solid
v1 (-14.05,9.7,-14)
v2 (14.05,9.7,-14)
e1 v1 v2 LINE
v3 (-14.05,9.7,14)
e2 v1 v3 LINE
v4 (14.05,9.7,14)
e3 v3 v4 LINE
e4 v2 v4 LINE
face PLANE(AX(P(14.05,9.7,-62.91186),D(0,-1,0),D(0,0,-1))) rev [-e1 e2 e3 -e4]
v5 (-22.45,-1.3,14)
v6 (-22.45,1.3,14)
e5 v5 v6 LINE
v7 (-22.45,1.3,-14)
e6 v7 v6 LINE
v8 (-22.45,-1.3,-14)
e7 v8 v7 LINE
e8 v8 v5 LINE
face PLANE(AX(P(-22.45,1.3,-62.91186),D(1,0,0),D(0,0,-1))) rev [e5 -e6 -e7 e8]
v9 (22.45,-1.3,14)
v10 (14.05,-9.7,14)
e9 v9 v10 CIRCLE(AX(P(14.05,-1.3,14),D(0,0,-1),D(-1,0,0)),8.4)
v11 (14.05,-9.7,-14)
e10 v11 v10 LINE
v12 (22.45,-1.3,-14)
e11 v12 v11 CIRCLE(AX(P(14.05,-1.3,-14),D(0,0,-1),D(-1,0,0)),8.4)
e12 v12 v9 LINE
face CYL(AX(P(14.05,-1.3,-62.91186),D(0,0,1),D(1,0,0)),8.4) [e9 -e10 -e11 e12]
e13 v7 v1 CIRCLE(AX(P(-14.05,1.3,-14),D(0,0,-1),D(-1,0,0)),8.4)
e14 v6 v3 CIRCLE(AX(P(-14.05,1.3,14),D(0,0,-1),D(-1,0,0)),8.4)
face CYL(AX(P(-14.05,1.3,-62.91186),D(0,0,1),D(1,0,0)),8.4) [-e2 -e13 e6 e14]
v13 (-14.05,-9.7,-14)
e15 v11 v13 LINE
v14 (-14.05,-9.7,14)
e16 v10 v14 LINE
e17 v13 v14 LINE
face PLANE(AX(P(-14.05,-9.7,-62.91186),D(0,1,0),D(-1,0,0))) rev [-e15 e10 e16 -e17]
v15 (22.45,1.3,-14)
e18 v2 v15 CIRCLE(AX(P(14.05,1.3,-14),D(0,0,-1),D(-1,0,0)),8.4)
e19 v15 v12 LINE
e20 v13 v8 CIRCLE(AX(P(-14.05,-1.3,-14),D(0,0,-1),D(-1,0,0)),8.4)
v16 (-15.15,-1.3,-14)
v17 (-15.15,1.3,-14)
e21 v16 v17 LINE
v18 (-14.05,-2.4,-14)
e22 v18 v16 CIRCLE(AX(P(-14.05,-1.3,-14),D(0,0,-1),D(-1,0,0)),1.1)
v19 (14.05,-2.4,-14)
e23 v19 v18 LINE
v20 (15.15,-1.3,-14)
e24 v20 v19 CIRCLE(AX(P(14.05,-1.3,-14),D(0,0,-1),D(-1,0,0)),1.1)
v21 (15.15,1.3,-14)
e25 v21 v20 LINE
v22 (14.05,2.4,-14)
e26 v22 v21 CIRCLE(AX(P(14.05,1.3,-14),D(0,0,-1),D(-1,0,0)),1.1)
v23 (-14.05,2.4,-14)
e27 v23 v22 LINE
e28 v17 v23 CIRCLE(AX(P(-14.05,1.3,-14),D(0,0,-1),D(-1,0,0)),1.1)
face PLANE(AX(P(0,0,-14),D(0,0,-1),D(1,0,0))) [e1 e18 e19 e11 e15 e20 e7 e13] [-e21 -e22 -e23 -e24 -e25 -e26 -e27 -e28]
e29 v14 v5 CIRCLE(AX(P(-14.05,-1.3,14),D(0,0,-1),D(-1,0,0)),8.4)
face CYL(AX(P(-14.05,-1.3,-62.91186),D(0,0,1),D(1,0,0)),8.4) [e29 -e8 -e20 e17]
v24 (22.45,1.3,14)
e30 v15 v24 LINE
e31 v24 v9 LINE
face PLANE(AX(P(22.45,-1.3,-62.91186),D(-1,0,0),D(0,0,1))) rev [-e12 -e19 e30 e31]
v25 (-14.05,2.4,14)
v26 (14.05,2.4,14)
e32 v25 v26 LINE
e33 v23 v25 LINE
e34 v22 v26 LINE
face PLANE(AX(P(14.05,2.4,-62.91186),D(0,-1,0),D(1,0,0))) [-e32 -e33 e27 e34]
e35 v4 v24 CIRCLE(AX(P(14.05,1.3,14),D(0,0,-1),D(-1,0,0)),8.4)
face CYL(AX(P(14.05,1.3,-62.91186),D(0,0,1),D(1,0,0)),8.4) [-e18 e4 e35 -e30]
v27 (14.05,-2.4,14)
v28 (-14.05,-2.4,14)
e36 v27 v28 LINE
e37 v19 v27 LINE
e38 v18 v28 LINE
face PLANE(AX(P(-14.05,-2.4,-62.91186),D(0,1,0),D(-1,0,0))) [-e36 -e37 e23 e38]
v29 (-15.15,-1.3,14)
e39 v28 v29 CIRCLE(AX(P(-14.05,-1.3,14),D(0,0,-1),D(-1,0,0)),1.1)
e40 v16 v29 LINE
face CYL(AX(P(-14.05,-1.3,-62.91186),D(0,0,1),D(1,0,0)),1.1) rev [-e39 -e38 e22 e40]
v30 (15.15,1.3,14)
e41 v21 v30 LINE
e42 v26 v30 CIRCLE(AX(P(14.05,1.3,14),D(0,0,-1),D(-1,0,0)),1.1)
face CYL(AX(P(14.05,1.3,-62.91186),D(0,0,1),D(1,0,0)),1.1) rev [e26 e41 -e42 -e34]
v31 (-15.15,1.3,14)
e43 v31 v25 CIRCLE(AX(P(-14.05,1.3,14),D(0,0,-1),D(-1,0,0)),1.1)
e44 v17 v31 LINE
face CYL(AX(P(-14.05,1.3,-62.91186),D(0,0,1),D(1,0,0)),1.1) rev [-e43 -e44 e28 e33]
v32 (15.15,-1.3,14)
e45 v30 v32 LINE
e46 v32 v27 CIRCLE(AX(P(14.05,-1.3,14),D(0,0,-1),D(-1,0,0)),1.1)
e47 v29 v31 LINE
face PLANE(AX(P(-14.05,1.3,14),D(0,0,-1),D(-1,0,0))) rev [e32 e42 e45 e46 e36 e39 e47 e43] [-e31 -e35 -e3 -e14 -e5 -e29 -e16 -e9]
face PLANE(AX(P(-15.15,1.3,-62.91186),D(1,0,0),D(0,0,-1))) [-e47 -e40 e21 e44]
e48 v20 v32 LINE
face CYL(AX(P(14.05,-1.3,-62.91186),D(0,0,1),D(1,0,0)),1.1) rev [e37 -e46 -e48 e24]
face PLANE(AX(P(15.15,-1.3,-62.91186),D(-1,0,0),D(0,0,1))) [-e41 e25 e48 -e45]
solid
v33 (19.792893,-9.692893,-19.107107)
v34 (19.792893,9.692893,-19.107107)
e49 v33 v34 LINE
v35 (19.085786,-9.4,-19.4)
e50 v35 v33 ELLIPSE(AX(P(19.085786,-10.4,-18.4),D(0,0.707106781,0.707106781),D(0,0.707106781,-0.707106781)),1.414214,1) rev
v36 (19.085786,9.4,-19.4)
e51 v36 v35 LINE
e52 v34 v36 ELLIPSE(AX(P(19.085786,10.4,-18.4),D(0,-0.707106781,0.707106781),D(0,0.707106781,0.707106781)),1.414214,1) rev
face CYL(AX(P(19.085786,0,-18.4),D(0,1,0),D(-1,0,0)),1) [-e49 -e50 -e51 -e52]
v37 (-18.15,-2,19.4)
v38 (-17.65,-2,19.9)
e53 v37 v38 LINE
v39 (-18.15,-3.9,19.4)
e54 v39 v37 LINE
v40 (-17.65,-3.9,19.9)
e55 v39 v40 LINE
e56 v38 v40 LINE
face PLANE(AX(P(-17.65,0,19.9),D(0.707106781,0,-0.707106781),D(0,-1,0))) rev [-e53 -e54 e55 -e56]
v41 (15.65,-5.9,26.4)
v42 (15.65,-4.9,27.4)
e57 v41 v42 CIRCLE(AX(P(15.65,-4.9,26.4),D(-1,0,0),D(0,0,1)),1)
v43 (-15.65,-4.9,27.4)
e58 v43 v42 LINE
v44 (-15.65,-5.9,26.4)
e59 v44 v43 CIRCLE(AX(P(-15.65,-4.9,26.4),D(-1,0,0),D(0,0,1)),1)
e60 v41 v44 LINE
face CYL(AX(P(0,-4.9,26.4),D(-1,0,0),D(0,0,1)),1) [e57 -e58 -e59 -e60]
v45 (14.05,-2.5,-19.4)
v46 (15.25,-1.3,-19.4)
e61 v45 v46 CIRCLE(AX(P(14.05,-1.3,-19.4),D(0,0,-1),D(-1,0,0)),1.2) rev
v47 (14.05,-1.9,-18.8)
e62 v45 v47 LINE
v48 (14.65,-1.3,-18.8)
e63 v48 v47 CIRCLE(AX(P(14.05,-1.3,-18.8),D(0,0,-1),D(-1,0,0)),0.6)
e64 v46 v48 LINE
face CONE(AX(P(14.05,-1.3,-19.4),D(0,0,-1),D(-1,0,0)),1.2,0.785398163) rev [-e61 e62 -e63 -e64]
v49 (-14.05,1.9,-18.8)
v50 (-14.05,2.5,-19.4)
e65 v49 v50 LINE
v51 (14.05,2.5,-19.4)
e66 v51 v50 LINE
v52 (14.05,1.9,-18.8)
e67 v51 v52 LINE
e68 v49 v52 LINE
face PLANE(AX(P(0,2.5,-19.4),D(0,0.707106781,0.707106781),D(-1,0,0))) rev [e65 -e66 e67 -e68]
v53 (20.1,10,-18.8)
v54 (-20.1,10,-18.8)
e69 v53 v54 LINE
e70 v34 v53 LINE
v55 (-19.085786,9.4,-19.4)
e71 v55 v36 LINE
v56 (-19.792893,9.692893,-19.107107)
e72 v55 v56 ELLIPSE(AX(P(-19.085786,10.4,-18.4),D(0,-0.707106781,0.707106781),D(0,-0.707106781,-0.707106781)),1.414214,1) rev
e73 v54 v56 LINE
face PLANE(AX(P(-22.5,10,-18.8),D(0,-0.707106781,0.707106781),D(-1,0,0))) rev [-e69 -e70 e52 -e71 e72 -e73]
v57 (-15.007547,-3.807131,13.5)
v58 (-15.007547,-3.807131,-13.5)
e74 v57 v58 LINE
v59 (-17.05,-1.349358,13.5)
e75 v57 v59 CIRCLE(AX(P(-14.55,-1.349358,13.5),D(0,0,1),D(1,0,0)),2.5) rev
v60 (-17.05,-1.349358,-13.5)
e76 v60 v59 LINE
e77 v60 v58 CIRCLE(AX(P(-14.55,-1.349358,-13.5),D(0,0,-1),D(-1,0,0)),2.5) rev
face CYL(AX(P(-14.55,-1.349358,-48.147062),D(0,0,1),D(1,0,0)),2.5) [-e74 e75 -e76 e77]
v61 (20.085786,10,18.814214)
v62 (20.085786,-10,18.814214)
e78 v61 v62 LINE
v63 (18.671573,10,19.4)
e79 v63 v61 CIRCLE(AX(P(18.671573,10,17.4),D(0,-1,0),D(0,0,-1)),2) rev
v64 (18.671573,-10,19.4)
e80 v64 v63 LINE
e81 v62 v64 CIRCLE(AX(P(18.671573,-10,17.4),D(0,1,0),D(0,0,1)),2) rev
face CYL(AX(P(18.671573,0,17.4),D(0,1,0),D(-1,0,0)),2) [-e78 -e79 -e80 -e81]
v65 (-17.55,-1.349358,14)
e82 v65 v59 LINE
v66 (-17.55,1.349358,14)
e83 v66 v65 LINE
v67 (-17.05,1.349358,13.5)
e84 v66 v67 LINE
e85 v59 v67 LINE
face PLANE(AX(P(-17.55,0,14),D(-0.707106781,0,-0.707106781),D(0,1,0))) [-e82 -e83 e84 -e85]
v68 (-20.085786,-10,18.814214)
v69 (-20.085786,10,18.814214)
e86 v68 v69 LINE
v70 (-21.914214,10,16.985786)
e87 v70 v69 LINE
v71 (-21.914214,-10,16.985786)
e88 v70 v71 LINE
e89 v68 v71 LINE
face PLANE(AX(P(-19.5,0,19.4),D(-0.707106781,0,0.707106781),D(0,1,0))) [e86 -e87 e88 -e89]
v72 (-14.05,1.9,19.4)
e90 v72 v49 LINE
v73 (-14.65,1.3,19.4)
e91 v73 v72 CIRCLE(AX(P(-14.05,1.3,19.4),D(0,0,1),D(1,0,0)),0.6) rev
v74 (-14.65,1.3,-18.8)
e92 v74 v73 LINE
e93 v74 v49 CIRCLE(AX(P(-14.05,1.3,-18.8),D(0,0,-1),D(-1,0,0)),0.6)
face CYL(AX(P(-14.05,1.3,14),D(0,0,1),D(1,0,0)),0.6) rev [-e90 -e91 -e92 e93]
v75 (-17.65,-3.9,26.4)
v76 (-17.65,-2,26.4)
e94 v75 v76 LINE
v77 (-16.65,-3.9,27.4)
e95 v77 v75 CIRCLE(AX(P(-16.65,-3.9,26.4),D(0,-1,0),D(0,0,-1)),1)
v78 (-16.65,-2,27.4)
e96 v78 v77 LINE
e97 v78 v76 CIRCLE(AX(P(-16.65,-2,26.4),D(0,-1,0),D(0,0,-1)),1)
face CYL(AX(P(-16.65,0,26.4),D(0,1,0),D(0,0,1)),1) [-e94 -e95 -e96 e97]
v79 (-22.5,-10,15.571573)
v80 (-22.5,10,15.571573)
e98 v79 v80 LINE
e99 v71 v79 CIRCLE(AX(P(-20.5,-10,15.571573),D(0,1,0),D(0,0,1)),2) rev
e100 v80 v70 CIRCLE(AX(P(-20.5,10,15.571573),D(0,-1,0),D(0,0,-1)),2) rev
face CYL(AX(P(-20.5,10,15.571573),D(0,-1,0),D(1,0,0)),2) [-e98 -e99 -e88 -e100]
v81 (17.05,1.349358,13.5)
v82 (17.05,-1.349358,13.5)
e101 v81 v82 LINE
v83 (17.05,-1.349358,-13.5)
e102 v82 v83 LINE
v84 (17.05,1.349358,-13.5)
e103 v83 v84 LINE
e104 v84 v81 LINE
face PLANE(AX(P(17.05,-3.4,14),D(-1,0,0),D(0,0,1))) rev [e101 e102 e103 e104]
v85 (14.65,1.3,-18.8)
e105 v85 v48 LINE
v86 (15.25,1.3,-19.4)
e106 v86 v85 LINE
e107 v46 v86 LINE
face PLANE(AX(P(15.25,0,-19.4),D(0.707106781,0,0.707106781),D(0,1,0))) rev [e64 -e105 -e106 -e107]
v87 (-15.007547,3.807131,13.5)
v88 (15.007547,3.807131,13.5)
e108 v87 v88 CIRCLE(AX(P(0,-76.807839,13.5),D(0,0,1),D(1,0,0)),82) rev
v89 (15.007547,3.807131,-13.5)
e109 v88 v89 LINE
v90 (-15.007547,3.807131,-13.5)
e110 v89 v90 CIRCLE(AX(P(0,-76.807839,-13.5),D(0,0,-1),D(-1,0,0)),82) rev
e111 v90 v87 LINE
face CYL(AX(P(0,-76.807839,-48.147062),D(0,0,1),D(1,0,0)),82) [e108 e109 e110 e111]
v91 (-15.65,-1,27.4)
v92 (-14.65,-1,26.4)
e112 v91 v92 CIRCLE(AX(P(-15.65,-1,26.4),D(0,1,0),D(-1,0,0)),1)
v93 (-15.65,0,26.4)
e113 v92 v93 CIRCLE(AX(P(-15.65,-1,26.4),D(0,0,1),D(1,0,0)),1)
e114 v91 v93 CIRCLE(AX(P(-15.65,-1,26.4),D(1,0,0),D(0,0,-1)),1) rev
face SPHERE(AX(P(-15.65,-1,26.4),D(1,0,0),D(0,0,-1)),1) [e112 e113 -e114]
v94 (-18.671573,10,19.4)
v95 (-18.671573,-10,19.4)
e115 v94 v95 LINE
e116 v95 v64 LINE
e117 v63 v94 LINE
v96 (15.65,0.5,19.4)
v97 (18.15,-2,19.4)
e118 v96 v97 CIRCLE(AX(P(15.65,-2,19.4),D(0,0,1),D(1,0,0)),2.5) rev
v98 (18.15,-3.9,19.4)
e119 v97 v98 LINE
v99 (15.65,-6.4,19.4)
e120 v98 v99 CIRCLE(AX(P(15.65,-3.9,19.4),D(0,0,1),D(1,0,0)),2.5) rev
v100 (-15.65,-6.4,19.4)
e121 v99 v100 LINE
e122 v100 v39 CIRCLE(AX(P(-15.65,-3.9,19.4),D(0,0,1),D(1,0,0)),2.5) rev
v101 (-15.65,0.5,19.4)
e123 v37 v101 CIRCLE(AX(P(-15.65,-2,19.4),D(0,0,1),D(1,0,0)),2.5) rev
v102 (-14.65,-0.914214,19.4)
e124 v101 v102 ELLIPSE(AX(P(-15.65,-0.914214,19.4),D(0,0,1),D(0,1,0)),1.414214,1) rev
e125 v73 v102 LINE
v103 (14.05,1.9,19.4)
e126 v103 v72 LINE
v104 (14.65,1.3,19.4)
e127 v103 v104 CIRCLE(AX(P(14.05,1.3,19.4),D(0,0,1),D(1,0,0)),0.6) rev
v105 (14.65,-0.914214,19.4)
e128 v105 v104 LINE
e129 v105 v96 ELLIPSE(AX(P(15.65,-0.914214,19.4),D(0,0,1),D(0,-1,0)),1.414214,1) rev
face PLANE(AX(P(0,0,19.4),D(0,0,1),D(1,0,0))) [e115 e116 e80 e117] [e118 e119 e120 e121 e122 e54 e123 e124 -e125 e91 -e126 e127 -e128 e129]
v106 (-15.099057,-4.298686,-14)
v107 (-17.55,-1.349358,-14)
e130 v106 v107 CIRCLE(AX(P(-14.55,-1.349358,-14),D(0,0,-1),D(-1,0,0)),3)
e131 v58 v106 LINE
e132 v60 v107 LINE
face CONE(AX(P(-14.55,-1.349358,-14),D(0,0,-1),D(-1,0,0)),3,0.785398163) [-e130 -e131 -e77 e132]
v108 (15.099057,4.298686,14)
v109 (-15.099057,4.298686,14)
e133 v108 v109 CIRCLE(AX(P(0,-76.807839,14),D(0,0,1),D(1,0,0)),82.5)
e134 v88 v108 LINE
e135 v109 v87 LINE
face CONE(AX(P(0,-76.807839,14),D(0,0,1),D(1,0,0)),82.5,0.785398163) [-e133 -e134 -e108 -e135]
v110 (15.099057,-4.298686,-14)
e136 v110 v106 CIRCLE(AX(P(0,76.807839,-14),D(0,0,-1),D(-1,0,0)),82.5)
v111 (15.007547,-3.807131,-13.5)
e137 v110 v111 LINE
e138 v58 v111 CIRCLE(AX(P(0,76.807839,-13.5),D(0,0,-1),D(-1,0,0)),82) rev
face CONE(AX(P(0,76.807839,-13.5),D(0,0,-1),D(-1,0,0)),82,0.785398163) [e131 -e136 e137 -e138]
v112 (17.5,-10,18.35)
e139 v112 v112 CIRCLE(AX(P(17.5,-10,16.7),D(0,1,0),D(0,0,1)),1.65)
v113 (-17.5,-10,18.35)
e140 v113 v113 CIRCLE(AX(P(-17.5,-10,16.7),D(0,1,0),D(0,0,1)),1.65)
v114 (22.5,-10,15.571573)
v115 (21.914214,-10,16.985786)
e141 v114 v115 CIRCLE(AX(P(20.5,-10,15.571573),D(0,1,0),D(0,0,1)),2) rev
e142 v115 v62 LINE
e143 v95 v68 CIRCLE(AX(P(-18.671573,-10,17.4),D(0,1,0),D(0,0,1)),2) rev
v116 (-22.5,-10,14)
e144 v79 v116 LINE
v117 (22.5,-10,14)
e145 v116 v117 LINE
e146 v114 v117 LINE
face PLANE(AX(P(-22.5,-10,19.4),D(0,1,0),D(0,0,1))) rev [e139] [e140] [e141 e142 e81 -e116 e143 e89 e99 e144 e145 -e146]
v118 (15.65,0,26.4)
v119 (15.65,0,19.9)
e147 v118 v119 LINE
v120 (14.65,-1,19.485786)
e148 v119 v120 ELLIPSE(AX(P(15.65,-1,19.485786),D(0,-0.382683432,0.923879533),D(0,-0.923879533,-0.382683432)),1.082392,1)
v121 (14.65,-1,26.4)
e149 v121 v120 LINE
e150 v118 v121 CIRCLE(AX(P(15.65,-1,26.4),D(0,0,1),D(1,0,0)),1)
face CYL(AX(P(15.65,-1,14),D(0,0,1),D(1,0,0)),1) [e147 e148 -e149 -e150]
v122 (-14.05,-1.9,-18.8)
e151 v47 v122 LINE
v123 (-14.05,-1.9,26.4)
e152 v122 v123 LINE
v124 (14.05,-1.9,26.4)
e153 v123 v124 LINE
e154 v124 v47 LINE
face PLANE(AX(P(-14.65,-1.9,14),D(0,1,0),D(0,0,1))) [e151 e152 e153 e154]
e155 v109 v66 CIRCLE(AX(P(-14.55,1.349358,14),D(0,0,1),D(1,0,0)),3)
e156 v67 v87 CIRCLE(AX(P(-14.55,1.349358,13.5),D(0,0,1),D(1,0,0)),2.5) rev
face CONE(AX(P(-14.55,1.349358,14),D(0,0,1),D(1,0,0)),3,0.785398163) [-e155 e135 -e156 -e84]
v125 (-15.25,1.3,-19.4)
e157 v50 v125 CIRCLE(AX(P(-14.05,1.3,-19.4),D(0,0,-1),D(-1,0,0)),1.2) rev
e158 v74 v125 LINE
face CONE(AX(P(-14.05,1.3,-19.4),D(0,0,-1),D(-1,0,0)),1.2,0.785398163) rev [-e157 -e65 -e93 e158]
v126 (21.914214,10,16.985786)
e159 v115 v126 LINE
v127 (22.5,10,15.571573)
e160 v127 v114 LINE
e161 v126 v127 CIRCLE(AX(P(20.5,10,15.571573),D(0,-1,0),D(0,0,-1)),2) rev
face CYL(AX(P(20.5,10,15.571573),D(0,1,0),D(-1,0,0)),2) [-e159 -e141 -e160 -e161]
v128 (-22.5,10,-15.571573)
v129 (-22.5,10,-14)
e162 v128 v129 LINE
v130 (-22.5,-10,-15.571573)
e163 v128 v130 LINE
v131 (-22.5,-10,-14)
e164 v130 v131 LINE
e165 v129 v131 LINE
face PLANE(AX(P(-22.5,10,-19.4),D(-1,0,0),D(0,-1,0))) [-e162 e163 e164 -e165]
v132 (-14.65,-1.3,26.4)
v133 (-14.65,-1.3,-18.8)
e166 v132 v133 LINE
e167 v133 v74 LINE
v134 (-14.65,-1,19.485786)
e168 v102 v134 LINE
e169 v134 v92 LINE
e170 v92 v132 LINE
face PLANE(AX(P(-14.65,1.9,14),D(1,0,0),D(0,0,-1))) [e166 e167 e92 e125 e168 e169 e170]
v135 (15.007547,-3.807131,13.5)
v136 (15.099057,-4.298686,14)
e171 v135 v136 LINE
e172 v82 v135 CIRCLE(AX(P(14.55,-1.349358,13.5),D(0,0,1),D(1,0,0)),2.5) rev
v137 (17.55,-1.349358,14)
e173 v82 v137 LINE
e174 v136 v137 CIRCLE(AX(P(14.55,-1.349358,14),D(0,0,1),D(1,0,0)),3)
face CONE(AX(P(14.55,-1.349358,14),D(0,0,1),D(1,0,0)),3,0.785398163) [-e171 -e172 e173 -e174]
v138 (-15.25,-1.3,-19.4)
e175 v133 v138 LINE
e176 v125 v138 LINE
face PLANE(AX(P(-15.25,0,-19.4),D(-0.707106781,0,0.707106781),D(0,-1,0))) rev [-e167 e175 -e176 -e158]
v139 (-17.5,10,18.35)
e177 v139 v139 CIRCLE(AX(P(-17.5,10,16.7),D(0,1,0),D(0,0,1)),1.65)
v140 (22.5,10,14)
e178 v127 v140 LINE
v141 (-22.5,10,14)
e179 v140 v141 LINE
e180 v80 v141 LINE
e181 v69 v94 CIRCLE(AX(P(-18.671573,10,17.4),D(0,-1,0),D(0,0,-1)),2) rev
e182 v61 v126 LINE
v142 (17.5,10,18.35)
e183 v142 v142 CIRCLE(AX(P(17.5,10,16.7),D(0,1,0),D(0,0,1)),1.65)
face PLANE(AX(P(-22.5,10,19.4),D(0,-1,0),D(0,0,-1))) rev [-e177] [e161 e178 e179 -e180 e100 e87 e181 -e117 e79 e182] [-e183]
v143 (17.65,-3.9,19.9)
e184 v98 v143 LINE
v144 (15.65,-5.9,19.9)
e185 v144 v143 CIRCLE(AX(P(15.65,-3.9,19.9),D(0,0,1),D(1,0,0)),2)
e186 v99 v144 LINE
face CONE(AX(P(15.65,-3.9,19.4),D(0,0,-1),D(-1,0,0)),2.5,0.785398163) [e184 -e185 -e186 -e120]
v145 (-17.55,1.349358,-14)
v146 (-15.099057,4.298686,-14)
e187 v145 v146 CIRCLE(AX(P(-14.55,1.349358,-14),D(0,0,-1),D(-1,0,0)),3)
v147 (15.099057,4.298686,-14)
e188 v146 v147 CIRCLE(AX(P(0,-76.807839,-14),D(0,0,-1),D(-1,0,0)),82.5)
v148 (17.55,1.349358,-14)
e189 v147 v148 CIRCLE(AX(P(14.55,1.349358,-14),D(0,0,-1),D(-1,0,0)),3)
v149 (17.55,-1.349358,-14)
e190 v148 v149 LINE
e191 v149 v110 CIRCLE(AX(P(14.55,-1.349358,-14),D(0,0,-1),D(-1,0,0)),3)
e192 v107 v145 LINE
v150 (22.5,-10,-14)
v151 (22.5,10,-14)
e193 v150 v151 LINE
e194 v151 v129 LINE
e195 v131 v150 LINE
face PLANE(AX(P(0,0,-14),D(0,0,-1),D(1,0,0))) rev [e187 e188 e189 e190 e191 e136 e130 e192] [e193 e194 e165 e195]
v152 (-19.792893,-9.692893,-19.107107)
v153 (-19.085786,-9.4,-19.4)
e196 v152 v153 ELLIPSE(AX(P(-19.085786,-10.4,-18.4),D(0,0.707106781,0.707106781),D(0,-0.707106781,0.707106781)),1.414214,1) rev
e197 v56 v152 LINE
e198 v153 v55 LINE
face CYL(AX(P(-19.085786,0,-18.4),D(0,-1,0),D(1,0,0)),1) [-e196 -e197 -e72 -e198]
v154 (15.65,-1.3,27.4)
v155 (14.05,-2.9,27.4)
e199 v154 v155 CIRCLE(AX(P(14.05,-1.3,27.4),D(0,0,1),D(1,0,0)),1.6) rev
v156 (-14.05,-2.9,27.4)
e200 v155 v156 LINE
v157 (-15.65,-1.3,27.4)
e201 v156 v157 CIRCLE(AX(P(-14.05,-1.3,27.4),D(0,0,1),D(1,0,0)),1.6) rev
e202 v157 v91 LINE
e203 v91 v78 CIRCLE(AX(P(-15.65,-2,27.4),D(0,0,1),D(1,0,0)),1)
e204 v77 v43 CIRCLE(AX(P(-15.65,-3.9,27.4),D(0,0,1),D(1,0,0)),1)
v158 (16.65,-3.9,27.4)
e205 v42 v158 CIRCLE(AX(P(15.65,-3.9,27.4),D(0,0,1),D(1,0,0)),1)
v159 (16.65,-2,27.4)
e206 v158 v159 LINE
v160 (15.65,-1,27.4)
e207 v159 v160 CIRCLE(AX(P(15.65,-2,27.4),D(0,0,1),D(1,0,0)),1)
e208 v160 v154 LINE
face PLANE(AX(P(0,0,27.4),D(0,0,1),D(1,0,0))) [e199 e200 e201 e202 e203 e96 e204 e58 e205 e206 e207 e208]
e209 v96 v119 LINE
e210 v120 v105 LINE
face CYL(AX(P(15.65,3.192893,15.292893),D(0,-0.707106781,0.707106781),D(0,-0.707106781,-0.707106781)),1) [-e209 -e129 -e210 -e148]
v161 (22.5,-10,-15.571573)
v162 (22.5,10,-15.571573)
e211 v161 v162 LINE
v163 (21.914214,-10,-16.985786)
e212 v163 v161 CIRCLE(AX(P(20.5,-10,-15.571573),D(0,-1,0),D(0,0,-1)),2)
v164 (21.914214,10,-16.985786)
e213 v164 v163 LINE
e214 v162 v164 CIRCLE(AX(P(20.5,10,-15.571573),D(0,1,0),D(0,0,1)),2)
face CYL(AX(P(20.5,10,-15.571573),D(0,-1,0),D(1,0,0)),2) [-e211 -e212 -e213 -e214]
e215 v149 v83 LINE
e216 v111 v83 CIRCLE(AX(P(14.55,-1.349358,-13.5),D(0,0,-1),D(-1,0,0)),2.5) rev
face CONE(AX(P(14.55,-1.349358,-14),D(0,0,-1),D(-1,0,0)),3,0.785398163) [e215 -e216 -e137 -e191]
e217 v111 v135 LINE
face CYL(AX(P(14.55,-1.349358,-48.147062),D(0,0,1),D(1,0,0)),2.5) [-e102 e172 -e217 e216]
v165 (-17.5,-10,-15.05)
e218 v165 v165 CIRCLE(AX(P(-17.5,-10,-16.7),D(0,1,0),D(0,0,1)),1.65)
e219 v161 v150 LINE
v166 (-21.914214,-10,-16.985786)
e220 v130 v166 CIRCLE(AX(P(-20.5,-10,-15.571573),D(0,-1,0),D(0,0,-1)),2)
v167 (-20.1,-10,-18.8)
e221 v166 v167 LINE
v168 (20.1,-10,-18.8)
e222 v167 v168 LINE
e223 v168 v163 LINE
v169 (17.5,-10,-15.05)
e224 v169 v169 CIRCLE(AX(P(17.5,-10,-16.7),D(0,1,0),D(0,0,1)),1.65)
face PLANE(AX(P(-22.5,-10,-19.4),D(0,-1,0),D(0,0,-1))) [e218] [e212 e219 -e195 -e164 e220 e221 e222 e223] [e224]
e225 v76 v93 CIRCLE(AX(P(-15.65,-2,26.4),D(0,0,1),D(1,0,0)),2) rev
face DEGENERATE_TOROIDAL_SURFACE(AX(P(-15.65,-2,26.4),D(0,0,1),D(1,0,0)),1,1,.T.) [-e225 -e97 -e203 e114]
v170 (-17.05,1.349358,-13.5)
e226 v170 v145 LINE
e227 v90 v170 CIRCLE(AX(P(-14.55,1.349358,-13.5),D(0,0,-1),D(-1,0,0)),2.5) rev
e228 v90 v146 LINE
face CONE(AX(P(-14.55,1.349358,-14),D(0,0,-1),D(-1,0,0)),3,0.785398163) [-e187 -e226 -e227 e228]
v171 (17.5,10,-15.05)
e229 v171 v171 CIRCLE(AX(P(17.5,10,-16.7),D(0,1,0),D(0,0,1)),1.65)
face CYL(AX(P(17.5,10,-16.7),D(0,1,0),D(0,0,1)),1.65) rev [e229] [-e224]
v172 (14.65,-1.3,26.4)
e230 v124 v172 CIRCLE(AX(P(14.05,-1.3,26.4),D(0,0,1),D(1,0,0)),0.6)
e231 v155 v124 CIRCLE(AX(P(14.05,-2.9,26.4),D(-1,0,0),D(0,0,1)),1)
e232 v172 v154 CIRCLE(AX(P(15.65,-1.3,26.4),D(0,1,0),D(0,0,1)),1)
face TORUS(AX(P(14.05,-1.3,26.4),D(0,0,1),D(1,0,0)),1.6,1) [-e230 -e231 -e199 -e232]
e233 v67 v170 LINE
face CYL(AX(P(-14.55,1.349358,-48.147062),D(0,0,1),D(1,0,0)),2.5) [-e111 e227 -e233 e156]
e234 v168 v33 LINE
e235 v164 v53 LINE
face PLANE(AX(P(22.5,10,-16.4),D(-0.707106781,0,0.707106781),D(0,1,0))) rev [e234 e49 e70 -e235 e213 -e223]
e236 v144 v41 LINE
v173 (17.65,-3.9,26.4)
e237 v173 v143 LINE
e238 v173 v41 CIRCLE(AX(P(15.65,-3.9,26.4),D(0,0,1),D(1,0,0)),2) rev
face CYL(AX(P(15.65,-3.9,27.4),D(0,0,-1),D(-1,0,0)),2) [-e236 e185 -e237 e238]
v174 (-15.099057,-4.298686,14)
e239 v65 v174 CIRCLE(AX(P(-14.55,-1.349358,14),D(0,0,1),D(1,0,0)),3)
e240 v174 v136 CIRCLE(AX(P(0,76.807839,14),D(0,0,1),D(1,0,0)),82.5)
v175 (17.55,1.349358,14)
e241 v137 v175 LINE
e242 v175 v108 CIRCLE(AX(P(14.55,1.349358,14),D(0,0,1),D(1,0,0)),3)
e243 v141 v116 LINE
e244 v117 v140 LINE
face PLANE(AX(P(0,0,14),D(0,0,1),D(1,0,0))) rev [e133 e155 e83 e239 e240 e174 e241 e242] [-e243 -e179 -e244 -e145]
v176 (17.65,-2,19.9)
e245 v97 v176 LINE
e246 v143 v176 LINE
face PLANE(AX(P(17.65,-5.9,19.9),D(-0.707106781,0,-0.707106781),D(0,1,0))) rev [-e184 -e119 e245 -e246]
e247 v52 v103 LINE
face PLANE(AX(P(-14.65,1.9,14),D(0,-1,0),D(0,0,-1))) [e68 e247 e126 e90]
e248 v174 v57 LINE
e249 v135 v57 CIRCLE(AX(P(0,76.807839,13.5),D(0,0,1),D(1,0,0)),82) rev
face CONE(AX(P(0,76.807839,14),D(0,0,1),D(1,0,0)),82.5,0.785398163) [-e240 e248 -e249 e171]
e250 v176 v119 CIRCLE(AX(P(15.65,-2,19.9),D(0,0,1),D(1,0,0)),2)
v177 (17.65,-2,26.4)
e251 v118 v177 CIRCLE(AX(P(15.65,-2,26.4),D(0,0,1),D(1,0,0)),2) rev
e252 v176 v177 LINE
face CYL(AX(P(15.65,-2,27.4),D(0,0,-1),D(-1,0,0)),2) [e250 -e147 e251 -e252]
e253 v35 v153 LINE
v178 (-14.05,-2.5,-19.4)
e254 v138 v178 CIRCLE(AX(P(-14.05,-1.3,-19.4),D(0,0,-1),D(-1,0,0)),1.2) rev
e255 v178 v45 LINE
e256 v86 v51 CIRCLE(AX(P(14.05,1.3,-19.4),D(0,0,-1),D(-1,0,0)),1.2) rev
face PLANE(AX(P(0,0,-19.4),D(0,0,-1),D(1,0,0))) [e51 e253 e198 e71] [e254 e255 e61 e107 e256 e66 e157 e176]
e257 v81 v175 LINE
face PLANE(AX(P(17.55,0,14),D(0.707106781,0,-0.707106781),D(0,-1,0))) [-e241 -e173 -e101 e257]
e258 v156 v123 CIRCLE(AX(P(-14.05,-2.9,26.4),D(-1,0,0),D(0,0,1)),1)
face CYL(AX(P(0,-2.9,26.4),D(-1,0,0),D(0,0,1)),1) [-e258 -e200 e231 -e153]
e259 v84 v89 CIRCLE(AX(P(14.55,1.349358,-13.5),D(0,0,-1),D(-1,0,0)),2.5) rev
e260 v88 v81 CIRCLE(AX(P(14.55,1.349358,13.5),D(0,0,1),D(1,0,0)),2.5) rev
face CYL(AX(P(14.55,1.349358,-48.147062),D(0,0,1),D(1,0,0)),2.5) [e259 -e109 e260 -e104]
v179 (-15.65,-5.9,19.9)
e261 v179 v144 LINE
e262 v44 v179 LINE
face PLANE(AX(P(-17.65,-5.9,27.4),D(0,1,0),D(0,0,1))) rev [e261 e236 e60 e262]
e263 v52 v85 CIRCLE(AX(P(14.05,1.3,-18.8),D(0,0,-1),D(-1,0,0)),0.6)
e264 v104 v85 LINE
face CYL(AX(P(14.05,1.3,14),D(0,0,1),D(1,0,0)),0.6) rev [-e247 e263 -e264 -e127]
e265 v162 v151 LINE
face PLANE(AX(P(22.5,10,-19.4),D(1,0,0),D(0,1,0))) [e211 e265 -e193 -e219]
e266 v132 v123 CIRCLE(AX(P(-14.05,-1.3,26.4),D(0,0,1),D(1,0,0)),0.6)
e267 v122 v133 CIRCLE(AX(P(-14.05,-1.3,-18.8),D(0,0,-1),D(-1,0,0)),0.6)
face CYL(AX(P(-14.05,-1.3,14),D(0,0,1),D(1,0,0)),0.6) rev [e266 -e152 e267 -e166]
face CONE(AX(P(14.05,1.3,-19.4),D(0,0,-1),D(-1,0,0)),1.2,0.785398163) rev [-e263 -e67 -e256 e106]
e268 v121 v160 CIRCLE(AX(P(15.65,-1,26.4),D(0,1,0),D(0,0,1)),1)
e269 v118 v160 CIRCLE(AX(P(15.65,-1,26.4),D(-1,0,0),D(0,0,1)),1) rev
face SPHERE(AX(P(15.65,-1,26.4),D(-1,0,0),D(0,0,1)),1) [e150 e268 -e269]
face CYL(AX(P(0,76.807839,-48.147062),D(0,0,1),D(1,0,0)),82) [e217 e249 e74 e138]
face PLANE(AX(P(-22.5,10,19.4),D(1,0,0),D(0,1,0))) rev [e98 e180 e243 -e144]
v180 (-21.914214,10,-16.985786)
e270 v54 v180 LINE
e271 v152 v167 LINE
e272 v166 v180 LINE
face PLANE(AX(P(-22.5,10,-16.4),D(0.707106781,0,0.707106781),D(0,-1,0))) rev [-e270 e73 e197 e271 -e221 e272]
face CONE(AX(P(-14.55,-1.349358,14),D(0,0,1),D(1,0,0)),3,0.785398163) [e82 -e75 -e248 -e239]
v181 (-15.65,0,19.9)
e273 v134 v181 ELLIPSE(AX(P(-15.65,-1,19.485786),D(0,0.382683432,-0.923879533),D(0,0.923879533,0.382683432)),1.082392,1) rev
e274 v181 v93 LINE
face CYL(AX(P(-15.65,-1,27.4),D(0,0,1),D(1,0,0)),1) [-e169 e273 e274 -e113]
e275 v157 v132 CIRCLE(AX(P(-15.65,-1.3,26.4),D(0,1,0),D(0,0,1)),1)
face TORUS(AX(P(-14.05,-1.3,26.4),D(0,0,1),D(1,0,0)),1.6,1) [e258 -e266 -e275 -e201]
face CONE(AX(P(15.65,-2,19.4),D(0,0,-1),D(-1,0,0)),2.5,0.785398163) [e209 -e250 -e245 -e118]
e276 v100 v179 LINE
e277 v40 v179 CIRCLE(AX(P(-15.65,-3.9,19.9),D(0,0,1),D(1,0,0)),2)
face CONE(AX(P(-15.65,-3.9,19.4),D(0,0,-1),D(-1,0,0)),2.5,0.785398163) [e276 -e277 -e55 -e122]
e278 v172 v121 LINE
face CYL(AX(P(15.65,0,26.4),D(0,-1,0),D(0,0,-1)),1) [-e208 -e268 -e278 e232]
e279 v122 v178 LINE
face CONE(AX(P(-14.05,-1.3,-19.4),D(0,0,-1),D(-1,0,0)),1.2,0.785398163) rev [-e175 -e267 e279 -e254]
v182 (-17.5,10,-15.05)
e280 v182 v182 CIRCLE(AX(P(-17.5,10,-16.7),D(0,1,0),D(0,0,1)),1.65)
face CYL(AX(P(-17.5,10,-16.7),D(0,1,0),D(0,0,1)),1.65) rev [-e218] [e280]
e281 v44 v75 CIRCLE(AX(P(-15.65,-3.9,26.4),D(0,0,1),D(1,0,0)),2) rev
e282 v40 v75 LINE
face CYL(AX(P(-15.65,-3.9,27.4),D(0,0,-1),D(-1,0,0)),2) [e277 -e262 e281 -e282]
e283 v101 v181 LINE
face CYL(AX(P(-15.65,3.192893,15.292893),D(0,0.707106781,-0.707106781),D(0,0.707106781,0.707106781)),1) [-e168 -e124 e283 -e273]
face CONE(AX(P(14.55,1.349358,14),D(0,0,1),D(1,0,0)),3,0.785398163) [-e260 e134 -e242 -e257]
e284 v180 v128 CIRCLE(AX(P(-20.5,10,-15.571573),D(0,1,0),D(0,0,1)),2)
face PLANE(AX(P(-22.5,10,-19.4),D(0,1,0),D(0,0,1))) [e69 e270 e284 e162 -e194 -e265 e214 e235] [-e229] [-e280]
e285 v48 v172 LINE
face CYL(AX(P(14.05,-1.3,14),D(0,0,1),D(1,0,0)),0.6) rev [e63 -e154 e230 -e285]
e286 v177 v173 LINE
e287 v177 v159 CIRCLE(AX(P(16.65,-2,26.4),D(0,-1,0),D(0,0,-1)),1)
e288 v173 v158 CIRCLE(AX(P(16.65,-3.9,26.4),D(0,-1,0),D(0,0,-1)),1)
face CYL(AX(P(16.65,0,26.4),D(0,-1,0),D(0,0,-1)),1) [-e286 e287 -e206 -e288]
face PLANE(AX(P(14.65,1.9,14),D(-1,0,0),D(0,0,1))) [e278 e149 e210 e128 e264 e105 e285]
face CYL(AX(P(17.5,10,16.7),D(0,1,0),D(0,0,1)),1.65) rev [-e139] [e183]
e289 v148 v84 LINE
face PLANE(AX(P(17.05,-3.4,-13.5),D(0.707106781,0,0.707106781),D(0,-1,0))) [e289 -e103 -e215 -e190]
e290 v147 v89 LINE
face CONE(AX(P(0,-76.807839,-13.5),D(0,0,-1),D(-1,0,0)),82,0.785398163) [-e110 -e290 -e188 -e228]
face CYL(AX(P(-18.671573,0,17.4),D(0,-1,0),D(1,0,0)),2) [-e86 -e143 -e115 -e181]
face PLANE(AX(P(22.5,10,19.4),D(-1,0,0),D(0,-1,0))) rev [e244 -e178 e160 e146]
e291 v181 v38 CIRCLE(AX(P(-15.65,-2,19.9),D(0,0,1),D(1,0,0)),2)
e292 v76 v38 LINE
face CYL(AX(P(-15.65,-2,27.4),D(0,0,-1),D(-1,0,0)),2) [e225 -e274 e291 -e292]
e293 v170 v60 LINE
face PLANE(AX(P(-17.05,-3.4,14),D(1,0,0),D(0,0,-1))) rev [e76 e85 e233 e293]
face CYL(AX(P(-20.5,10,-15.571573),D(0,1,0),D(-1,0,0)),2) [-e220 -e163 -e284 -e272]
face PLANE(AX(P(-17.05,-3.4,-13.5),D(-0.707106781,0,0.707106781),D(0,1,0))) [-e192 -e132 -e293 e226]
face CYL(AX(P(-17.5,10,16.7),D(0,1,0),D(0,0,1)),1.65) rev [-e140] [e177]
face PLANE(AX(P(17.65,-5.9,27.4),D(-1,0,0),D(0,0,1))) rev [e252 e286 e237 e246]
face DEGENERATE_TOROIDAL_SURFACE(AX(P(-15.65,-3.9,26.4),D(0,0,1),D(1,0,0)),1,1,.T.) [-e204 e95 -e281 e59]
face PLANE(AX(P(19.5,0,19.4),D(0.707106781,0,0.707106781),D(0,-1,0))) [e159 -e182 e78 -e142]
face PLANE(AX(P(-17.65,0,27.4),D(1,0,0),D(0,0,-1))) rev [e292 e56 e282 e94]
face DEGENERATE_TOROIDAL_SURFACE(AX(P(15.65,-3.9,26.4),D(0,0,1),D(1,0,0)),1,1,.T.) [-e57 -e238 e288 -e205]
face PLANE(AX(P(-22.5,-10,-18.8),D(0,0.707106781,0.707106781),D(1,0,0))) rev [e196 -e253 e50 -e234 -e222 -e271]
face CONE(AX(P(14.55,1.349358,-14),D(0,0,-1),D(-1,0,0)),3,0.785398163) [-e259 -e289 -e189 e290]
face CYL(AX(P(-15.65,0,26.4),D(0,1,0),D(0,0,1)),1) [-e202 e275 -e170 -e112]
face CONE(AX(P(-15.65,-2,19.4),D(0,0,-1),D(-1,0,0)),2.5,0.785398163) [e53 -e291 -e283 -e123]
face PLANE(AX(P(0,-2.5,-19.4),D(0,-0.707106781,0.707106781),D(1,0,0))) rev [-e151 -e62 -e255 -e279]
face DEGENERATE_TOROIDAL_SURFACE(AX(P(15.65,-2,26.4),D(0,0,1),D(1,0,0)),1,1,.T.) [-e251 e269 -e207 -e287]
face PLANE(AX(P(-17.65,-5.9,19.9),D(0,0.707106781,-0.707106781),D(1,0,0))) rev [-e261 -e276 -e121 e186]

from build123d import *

# Parameters (mm, degrees)
SKETCH1_W             = 34.1
SKETCH1_H             = 6.8
SKETCH1_W_2           = 29.3
SKETCH1_H_2           = 3.8
CENTER_TUBE_DEPTH     = 14
CURVATURE_DEPTH       = 28
SKETCH2_W             = 45
SKETCH2_H             = 20
SKETCH2_W_2           = 29.3
SKETCH2_H_2           = 3.8
FLANGE_DEPTH          = 5.4
M3_CLEARANCE_HOLE1_D  = 3.3
BOSS_EXTRUDE3_DEPTH   = 8
FILLET_CENTER_EDGES_R = 2.5
CHAMFER1_SIZE         = 3
FILLET4_R             = 2
FILLET6_R             = 0.6
CHAMFER2_SIZE         = 0.5
FILLET7_R             = 2
BOSS_EXTRUDE4_DEPTH   = 28
CHAMFER3_SIZE         = 0.6
FILLET8_R             = 1


with BuildPart() as part:
    # Sketch1 → Center Tube (new, symmetric)
    with BuildSketch(Plane.XY):
        Rectangle(SKETCH1_W, SKETCH1_H)
        Rectangle(SKETCH1_W_2, SKETCH1_H_2, mode=Mode.SUBTRACT)
    extrude(amount=CENTER_TUBE_DEPTH, both=True)

    # Sketch55 → Curvature (add)
    with BuildSketch(Plane.XY.offset(14)):
        with BuildLine():
            Line((-17.05, 3.4), (17.05, 3.4))
            ThreePointArc((17.05, 3.4), (0, 5.192160608), (-17.05, 3.4))
        make_face()
        with BuildLine():
            Line((-17.05, -3.4), (17.05, -3.4))
            ThreePointArc((17.05, -3.4), (0, -5.192160608), (-17.05, -3.4))
        make_face()
    extrude(amount=-CURVATURE_DEPTH)

    # Sketch2 → Flange (add)
    with BuildSketch(Plane.XY.offset(14)):
        Rectangle(SKETCH2_W, SKETCH2_H)
        Rectangle(SKETCH2_W_2, SKETCH2_H_2, mode=Mode.SUBTRACT)
    flange = extrude(amount=FLANGE_DEPTH)

    # Mirror1: Flange across plane
    add(flange.mirror(Plane.XY))

    # M3 Clearance Hole1 (through all)
    with Locations(Plane(origin=(0, 10, 0), x_dir=(1, 0, 0), z_dir=(0, 1, 0))):
        with Locations((-17.5, -16.7), (-17.5, 16.7), (17.5, 16.7), (17.5, -16.7)):
            Hole(M3_CLEARANCE_HOLE1_D / 2)

    # Sketch14 → Boss-Extrude3 (add)
    with BuildSketch(Plane.XY.offset(19.4)):
        Polygon((-14.65, 0), (-17.65, 0), (-17.65, -5.9), (17.65, -5.9), (17.65, 0), (14.65, 0), (14.65, -1.9), (-14.65, -1.9), align=None)
    extrude(amount=BOSS_EXTRUDE3_DEPTH)

    # Fillet Center Edges
    fillet_center_edges_edges = [part.edges().sort_by_distance(p)[0] for p in [
        (17.05, -3.4, 0),
        (-17.05, -3.4, 0),
        (-17.05, 3.4, 0),
        (17.05, 3.4, 0),
    ]]
    fillet(fillet_center_edges_edges, radius=FILLET_CENTER_EDGES_R)

    # Chamfer1
    chamfer1_edges = [part.edges().sort_by_distance(p)[0] for p in [
        (-22.5, 0, 19.4),
        (22.5, 0, 19.4),
        (-22.5, 0, -19.4),
        (22.5, 0, -19.4),
    ]]
    chamfer(chamfer1_edges, length=CHAMFER1_SIZE)

    # Fillet4
    fillet4_edges = [part.edges().sort_by_distance(p)[0] for p in [
        (-17.65, 0, 23.4),
        (-17.65, -5.9, 23.4),
        (17.65, -5.9, 23.4),
        (17.65, 0, 23.4),
    ]]
    fillet(fillet4_edges, radius=FILLET4_R)

    # Fillet6
    fillet6_edges = [part.edges().sort_by_distance(p)[0] for p in [
        (14.65, -1.9, 4),
        (14.65, 1.9, 0),
        (-14.65, 1.9, 0),
        (-14.65, -1.9, 4),
    ]]
    fillet(fillet6_edges, radius=FILLET6_R)

    # Chamfer2
    chamfer2_edges = [part.edges().sort_by_distance(p)[0] for p in [
        (-15.15, 0, 19.4),
        (0, -5.192160608, -14),
        (0, -5.192160608, 14),
        (-17.05, 0, -14),
        (-17.05, 0, 14),
        (0, 5.192160608, -14),
        (0, 5.192160608, 14),
        (17.05, 0, -14),
        (17.05, 0, 14),
        (-16.472741262, -2.94718964, -14),
        (-16.472741262, -2.94718964, 14),
        (16.472741262, 2.94718964, -14),
        (16.472741262, 2.94718964, 14),
        (16.472741262, -2.94718964, -14),
        (16.472741262, -2.94718964, 14),
        (-16.472741262, 2.94718964, -14),
        (-16.472741262, 2.94718964, 14),
        (17.65, -2.95, 19.4),
        (0, -5.9, 19.4),
        (-17.65, -2.95, 19.4),
        (15.15, 0, 19.4),
        (17.064213562, -5.314213562, 19.4),
        (-17.064213562, -5.314213562, 19.4),
        (17.064213562, -0.585786438, 19.4),
        (-17.064213562, -0.585786438, 19.4),
    ]]
    chamfer(chamfer2_edges, length=CHAMFER2_SIZE)

    # Fillet7
    fillet7_edges = [part.edges().sort_by_distance(p)[0] for p in [
        (-22.5, 0, -16.4),
        (22.5, 0, -16.4),
        (-19.5, 0, 19.4),
        (19.5, 0, 19.4),
        (22.5, 0, 16.4),
        (-22.5, 0, 16.4),
    ]]
    fillet(fillet7_edges, radius=FILLET7_R)

    # Chamfer3
    chamfer3_edges = [part.edges().sort_by_distance(p)[0] for p in [
        (0, -10, -19.4),
        (0, 10, -19.4),
        (0, 1.9, -19.4),
        (-14.65, 0, -19.4),
        (14.65, 0, -19.4),
        (0, -1.9, -19.4),
        (-14.474264069, 1.724264069, -19.4),
        (14.474264069, 1.724264069, -19.4),
        (14.474264069, -1.724264069, -19.4),
        (-14.474264069, -1.724264069, -19.4),
    ]]
    chamfer(chamfer3_edges, length=CHAMFER3_SIZE)

    # Fillet8
    fillet8_edges = [part.edges().sort_by_distance(p)[0] for p in [
        (-19.5, 0, -19.4),
        (19.5, 0, -19.4),
        (-17.064213562, -5.314213562, 27.4),
        (-17.65, -2.95, 27.4),
        (-17.064213562, -0.585786438, 27.4),
        (-14.65, -0.65, 27.4),
        (-14.474264069, -1.724264069, 27.4),
        (0, -1.9, 27.4),
        (14.474264069, -1.724264069, 27.4),
        (14.65, -0.65, 27.4),
        (17.064213562, -0.585786438, 27.4),
        (17.65, -2.95, 27.4),
        (17.064213562, -5.314213562, 27.4),
        (0, -5.9, 27.4),
        (14.65, 0, 23.65),
        (-14.65, 0, 23.65),
        (14.65, 0.25, 19.65),
        (-14.65, 0.25, 19.65),
    ]]
    fillet(fillet8_edges, radius=FILLET8_R - 0.0001)  # a hair under: the kernel refuses the full size


with BuildPart() as body_2:
    # Sketch54 → Boss-Extrude4 (new body)
    with BuildSketch(Plane(origin=(0, 0, 14), x_dir=(-1, 0, 0), z_dir=(0, 0, -1))):
        with BuildLine():
            Line((22.45, 1.3), (22.45, -1.3))
            ThreePointArc((22.45, -1.3), (19.989696962, -7.239696962), (14.05, -9.7))
            Line((14.05, -9.7), (-14.05, -9.7))
            ThreePointArc((-14.05, -9.7), (-19.989696962, -7.239696962), (-22.45, -1.3))
            Line((-22.45, -1.3), (-22.45, 1.3))
            ThreePointArc((-22.45, 1.3), (-19.989696962, 7.239696962), (-14.05, 9.7))
            Line((-14.05, 9.7), (14.05, 9.7))
            ThreePointArc((14.05, 9.7), (19.989696962, 7.239696962), (22.45, 1.3))
        make_face()
        with BuildLine():
            Line((15.15, 1.3), (15.15, -1.3))
            ThreePointArc((15.15, -1.3), (14.827817459, -2.077817459), (14.05, -2.4))
            Line((14.05, -2.4), (-14.05, -2.4))
            ThreePointArc((-14.05, -2.4), (-14.827817459, -2.077817459), (-15.15, -1.3))
            Line((-15.15, -1.3), (-15.15, 1.3))
            ThreePointArc((-15.15, 1.3), (-14.827817459, 2.077817459), (-14.05, 2.4))
            Line((-14.05, 2.4), (14.05, 2.4))
            ThreePointArc((14.05, 2.4), (14.827817459, 2.077817459), (15.15, 1.3))
        make_face(mode=Mode.SUBTRACT)
    extrude(amount=BOSS_EXTRUDE4_DEPTH)


solid = Compound([part.part, body_2.part])
